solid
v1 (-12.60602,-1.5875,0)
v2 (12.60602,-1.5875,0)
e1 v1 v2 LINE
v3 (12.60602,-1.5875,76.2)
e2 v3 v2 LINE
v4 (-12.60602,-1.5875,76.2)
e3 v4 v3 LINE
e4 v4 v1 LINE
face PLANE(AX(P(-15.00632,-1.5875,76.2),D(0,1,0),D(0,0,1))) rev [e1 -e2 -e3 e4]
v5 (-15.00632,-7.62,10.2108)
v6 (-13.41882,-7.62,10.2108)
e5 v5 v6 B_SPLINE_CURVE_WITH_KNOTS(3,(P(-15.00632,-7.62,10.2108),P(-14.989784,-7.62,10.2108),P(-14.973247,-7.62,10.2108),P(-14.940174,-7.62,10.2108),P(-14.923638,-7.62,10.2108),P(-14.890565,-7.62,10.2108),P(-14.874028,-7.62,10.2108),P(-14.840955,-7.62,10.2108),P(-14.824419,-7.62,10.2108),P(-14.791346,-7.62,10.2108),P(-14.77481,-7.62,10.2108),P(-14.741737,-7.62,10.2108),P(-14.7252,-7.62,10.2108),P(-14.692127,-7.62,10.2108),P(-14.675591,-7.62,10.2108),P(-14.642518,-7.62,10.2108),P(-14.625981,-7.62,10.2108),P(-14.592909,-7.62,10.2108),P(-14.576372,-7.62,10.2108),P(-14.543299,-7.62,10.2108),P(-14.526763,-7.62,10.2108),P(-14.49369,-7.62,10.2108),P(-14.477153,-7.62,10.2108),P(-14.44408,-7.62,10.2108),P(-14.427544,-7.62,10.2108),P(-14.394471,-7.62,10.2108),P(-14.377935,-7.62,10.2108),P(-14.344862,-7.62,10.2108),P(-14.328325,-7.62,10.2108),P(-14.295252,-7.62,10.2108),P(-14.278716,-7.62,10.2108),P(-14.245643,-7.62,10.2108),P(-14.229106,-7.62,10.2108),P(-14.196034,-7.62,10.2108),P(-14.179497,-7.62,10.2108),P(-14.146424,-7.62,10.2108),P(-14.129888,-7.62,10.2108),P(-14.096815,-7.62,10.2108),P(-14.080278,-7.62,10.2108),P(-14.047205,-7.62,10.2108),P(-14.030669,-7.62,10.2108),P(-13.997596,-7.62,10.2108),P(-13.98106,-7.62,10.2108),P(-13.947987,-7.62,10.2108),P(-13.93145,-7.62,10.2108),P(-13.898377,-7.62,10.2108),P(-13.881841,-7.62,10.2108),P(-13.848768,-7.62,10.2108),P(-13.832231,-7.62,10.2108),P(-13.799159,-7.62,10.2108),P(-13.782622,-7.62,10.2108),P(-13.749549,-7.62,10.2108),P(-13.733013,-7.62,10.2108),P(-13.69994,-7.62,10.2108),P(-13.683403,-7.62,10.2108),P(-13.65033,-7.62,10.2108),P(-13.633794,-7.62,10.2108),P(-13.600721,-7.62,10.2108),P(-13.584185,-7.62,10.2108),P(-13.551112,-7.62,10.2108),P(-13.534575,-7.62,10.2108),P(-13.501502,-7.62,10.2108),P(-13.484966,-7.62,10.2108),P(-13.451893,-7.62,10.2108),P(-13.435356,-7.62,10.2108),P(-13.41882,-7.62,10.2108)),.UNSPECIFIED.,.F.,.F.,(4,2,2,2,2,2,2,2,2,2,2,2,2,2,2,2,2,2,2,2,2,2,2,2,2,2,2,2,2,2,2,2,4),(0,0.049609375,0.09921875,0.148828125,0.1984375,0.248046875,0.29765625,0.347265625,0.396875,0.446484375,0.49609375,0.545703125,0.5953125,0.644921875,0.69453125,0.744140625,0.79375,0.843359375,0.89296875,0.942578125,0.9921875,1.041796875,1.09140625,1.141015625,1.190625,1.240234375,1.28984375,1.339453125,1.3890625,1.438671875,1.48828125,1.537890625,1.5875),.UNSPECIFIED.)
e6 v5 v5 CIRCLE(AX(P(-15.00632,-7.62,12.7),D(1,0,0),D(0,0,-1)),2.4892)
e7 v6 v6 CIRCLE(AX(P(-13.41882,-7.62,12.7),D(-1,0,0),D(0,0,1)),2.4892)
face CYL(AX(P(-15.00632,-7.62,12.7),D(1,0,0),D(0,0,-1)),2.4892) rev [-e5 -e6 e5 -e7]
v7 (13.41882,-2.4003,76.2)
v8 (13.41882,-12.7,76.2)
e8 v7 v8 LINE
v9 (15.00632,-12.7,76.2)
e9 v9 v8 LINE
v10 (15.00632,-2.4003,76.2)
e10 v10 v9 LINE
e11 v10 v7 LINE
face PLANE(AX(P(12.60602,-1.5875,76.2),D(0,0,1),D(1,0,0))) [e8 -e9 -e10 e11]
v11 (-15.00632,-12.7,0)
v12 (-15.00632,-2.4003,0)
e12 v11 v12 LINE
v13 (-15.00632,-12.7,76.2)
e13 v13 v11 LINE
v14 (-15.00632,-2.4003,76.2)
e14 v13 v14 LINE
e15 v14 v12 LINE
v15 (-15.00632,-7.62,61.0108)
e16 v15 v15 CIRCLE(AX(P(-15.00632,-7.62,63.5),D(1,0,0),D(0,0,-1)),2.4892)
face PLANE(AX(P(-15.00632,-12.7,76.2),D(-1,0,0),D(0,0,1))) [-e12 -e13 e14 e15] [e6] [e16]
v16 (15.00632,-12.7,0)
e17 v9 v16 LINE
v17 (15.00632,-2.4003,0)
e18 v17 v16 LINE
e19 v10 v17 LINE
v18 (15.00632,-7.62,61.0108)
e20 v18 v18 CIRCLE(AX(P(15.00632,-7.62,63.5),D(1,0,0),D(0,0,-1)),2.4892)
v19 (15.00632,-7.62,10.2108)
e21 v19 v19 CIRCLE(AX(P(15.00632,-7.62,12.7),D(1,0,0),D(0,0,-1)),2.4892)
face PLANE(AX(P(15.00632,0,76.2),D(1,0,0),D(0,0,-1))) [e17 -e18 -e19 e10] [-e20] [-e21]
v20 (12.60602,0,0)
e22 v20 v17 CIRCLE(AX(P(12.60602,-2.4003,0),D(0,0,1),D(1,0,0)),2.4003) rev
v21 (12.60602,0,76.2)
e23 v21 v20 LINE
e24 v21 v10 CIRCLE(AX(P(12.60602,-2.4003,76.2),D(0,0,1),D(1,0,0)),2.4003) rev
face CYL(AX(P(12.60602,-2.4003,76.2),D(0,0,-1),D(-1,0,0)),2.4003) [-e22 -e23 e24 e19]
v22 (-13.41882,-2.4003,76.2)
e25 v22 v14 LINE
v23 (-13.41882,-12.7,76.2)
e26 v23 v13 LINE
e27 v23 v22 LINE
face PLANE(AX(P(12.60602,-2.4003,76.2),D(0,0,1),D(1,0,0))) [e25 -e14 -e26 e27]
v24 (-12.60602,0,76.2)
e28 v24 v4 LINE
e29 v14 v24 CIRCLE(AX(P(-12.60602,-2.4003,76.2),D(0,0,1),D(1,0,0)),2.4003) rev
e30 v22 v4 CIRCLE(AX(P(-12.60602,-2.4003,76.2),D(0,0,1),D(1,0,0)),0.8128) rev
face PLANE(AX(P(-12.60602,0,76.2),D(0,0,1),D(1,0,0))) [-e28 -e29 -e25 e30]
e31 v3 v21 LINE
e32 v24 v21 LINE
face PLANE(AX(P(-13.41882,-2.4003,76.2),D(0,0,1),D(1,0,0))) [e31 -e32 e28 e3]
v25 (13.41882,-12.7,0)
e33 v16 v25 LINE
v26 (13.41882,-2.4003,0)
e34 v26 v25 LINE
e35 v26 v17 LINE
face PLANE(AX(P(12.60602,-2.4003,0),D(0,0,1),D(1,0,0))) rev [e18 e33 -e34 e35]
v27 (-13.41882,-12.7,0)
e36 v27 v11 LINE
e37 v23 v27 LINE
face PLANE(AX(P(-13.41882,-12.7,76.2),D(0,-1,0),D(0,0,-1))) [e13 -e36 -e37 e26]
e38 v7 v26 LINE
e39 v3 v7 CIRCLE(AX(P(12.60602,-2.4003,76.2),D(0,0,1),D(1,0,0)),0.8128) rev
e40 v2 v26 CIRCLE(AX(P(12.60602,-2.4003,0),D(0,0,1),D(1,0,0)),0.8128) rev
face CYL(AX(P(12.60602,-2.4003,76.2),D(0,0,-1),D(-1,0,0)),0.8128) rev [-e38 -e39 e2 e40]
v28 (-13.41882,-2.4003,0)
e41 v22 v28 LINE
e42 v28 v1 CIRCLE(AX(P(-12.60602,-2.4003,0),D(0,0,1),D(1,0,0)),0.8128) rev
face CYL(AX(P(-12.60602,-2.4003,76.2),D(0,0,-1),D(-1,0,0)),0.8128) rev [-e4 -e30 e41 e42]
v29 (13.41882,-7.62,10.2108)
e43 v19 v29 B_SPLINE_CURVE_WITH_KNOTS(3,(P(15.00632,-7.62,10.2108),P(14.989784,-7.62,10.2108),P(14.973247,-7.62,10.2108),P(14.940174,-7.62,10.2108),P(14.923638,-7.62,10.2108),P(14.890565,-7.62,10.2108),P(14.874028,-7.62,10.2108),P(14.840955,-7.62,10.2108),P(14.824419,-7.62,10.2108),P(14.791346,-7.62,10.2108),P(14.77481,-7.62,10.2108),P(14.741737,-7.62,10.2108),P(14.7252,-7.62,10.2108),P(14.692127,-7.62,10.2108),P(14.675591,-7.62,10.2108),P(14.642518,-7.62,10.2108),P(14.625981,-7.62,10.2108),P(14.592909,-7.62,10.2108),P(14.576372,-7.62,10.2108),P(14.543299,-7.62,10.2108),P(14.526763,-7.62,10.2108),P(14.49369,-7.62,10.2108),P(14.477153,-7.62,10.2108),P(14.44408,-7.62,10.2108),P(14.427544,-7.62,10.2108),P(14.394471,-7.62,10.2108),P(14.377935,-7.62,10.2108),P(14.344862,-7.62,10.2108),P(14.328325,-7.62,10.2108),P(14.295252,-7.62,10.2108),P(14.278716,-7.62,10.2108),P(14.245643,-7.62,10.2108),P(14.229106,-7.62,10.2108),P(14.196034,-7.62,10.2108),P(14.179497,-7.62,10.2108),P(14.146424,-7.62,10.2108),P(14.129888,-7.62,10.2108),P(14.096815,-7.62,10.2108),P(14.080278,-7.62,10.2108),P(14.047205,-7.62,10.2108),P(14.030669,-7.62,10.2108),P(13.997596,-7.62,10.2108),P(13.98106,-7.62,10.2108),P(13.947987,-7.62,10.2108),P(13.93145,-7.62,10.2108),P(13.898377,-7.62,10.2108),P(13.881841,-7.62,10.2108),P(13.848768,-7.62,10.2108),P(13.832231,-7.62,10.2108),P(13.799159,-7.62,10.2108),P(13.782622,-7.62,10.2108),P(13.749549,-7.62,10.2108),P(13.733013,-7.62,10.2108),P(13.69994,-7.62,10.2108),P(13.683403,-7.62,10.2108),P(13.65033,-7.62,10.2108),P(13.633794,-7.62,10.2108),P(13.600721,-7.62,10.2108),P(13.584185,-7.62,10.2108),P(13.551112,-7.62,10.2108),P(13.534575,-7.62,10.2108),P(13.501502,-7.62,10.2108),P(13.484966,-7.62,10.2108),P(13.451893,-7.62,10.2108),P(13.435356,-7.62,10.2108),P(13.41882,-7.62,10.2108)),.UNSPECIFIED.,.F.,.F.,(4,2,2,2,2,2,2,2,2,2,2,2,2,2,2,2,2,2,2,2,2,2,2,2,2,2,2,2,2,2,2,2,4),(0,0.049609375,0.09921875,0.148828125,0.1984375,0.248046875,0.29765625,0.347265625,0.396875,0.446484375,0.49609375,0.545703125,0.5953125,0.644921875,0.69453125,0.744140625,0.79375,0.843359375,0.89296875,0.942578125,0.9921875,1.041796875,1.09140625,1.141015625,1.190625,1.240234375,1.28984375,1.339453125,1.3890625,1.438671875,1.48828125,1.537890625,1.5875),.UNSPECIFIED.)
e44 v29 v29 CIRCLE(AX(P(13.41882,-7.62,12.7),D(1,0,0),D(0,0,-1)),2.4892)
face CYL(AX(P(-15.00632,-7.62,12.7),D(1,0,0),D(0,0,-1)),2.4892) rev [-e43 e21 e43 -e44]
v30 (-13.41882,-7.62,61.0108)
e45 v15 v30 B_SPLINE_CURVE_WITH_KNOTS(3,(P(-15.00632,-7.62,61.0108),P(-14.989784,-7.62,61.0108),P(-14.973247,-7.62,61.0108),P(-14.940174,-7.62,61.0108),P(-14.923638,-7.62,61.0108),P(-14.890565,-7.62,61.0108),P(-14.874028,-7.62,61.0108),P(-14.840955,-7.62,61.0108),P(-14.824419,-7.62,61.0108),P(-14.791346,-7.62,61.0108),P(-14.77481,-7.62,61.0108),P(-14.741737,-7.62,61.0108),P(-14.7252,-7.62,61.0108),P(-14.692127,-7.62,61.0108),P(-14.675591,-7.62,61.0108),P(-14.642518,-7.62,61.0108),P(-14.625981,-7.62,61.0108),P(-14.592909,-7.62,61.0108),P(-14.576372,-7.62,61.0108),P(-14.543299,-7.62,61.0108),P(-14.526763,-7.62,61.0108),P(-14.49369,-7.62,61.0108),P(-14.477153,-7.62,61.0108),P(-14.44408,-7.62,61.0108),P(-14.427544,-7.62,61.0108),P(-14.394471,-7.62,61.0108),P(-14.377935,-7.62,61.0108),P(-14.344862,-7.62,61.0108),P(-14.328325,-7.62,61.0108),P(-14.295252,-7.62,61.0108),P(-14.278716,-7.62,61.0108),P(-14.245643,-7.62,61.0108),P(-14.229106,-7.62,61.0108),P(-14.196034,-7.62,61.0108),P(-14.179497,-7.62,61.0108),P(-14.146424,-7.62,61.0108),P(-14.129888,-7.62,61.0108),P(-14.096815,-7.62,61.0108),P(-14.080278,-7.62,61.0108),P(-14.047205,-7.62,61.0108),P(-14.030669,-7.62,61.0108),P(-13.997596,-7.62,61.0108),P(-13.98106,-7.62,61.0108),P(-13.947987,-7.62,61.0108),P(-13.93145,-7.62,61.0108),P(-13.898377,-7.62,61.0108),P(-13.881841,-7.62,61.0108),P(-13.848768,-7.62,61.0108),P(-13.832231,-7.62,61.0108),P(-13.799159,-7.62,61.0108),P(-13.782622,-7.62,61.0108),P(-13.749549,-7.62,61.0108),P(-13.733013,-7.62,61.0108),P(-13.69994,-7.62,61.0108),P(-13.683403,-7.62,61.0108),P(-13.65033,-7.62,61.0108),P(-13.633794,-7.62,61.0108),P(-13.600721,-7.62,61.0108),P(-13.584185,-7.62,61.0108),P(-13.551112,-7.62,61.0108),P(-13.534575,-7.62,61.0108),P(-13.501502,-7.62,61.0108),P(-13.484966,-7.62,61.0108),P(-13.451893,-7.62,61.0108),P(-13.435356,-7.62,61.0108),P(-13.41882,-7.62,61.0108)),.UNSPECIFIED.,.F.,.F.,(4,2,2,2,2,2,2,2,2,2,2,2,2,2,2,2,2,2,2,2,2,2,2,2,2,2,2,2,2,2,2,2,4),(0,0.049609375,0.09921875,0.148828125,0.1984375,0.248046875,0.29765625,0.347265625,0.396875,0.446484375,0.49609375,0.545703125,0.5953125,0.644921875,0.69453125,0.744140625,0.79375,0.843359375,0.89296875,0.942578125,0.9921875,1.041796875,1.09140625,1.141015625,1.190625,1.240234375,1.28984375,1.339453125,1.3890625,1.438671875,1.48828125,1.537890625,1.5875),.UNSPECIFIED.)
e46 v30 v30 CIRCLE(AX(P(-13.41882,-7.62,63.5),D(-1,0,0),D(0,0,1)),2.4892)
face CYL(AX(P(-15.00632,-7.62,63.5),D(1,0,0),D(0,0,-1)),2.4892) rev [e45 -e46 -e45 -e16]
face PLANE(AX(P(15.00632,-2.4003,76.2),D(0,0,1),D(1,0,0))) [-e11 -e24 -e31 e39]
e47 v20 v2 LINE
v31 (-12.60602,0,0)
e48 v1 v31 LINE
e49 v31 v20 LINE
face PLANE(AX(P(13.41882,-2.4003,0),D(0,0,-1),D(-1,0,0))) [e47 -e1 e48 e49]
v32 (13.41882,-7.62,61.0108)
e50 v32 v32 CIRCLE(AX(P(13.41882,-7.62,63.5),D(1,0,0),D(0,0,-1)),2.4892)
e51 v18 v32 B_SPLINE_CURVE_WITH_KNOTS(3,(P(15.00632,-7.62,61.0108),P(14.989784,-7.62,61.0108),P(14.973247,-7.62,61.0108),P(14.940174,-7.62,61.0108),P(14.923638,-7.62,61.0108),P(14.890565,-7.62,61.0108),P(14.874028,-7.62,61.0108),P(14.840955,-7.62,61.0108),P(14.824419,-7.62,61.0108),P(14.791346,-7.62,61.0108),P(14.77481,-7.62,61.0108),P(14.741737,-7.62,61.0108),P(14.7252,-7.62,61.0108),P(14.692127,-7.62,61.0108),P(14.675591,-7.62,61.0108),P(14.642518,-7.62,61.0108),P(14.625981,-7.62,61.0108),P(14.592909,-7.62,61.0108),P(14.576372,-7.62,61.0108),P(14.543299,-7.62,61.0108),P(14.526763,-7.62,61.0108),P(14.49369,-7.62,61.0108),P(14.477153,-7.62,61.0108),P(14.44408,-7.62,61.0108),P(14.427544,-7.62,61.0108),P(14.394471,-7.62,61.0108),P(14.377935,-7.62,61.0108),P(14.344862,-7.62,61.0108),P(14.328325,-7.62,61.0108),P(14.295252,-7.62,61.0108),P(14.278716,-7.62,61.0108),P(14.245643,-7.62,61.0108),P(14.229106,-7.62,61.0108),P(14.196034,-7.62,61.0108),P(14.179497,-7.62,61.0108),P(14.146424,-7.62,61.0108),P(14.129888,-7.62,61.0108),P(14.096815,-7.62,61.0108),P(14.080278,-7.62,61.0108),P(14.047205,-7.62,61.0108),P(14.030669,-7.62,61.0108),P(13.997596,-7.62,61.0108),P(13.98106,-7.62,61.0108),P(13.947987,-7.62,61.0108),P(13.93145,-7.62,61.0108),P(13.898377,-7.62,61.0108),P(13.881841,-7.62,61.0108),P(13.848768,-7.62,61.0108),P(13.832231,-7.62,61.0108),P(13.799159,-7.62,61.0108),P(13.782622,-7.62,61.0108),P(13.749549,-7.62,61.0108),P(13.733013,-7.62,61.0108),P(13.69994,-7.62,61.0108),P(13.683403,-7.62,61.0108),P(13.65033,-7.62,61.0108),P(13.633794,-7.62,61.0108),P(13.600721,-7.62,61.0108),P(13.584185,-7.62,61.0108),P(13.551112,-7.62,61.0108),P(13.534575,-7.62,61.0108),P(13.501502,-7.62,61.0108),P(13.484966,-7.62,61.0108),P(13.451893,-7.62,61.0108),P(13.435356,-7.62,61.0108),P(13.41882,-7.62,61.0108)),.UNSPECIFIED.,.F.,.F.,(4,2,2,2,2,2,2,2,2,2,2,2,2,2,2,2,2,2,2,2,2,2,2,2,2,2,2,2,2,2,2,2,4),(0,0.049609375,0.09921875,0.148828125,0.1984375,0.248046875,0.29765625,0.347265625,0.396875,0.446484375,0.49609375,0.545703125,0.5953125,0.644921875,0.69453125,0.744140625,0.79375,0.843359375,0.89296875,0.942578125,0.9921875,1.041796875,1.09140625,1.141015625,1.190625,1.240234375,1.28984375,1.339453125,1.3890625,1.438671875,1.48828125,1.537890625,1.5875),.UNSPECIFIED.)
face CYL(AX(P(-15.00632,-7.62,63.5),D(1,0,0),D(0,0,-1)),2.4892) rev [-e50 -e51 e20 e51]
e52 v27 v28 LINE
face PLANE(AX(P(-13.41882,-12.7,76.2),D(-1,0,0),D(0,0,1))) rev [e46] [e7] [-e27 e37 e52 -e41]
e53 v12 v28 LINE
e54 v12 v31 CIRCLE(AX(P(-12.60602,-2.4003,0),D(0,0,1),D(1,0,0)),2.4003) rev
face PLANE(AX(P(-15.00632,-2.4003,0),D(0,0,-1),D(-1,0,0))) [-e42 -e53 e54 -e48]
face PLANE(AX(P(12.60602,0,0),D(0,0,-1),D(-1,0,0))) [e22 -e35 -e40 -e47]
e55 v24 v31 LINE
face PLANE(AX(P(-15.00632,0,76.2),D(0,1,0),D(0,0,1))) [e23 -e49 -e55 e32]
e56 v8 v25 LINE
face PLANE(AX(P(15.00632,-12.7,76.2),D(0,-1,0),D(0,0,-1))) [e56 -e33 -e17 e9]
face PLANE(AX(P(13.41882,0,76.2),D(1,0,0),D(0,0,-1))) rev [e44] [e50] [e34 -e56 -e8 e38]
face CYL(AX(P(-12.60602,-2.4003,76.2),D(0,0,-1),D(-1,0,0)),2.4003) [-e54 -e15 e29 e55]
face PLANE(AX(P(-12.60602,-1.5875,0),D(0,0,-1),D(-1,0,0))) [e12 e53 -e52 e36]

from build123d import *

# Parameters (mm, degrees)
BASE_FLANGE1_DEPTH = 76.2
SKETCH2_R          = 2.4892
CUT_EXTRUDE1_DEPTH = 83.876344995


# Sheet-metal steps are written as plain solids
with BuildPart() as part:
    # Sketch1 → Base-Flange1 (new body)
    with BuildSketch(Plane.XY):
        with BuildLine():
            Line((-15.00632, -12.7), (-15.00632, -2.4003))
            ThreePointArc((-15.00632, -2.4003), (-14.303288407, -0.703031593), (-12.60602, 0))
            Line((-12.60602, 0), (12.60602, 0))
            ThreePointArc((12.60602, 0), (14.303288407, -0.703031593), (15.00632, -2.4003))
            Line((15.00632, -2.4003), (15.00632, -12.7))
            Line((15.00632, -12.7), (13.41882, -12.7))
            Line((13.41882, -12.7), (13.41882, -2.4003))
            ThreePointArc((13.41882, -2.4003), (13.180756392, -1.825563608), (12.60602, -1.5875))
            Line((12.60602, -1.5875), (-12.60602, -1.5875))
            ThreePointArc((-12.60602, -1.5875), (-13.180756392, -1.825563608), (-13.41882, -2.4003))
            Line((-13.41882, -2.4003), (-13.41882, -12.7))
            Line((-13.41882, -12.7), (-15.00632, -12.7))
        make_face()
    extrude(amount=BASE_FLANGE1_DEPTH)

    # Sketch2 → Cut-Extrude1 (cut, through all)
    with BuildSketch(Plane(origin=(15.00632, 0, 0), x_dir=(0, 0, -1), z_dir=(1, 0, 0))):
        with Locations((-63.5, -7.62)):
            Circle(SKETCH2_R)
        with Locations((-12.7, -7.62)):
            Circle(SKETCH2_R)
    extrude(amount=-CUT_EXTRUDE1_DEPTH, mode=Mode.SUBTRACT)


solid = part.part
